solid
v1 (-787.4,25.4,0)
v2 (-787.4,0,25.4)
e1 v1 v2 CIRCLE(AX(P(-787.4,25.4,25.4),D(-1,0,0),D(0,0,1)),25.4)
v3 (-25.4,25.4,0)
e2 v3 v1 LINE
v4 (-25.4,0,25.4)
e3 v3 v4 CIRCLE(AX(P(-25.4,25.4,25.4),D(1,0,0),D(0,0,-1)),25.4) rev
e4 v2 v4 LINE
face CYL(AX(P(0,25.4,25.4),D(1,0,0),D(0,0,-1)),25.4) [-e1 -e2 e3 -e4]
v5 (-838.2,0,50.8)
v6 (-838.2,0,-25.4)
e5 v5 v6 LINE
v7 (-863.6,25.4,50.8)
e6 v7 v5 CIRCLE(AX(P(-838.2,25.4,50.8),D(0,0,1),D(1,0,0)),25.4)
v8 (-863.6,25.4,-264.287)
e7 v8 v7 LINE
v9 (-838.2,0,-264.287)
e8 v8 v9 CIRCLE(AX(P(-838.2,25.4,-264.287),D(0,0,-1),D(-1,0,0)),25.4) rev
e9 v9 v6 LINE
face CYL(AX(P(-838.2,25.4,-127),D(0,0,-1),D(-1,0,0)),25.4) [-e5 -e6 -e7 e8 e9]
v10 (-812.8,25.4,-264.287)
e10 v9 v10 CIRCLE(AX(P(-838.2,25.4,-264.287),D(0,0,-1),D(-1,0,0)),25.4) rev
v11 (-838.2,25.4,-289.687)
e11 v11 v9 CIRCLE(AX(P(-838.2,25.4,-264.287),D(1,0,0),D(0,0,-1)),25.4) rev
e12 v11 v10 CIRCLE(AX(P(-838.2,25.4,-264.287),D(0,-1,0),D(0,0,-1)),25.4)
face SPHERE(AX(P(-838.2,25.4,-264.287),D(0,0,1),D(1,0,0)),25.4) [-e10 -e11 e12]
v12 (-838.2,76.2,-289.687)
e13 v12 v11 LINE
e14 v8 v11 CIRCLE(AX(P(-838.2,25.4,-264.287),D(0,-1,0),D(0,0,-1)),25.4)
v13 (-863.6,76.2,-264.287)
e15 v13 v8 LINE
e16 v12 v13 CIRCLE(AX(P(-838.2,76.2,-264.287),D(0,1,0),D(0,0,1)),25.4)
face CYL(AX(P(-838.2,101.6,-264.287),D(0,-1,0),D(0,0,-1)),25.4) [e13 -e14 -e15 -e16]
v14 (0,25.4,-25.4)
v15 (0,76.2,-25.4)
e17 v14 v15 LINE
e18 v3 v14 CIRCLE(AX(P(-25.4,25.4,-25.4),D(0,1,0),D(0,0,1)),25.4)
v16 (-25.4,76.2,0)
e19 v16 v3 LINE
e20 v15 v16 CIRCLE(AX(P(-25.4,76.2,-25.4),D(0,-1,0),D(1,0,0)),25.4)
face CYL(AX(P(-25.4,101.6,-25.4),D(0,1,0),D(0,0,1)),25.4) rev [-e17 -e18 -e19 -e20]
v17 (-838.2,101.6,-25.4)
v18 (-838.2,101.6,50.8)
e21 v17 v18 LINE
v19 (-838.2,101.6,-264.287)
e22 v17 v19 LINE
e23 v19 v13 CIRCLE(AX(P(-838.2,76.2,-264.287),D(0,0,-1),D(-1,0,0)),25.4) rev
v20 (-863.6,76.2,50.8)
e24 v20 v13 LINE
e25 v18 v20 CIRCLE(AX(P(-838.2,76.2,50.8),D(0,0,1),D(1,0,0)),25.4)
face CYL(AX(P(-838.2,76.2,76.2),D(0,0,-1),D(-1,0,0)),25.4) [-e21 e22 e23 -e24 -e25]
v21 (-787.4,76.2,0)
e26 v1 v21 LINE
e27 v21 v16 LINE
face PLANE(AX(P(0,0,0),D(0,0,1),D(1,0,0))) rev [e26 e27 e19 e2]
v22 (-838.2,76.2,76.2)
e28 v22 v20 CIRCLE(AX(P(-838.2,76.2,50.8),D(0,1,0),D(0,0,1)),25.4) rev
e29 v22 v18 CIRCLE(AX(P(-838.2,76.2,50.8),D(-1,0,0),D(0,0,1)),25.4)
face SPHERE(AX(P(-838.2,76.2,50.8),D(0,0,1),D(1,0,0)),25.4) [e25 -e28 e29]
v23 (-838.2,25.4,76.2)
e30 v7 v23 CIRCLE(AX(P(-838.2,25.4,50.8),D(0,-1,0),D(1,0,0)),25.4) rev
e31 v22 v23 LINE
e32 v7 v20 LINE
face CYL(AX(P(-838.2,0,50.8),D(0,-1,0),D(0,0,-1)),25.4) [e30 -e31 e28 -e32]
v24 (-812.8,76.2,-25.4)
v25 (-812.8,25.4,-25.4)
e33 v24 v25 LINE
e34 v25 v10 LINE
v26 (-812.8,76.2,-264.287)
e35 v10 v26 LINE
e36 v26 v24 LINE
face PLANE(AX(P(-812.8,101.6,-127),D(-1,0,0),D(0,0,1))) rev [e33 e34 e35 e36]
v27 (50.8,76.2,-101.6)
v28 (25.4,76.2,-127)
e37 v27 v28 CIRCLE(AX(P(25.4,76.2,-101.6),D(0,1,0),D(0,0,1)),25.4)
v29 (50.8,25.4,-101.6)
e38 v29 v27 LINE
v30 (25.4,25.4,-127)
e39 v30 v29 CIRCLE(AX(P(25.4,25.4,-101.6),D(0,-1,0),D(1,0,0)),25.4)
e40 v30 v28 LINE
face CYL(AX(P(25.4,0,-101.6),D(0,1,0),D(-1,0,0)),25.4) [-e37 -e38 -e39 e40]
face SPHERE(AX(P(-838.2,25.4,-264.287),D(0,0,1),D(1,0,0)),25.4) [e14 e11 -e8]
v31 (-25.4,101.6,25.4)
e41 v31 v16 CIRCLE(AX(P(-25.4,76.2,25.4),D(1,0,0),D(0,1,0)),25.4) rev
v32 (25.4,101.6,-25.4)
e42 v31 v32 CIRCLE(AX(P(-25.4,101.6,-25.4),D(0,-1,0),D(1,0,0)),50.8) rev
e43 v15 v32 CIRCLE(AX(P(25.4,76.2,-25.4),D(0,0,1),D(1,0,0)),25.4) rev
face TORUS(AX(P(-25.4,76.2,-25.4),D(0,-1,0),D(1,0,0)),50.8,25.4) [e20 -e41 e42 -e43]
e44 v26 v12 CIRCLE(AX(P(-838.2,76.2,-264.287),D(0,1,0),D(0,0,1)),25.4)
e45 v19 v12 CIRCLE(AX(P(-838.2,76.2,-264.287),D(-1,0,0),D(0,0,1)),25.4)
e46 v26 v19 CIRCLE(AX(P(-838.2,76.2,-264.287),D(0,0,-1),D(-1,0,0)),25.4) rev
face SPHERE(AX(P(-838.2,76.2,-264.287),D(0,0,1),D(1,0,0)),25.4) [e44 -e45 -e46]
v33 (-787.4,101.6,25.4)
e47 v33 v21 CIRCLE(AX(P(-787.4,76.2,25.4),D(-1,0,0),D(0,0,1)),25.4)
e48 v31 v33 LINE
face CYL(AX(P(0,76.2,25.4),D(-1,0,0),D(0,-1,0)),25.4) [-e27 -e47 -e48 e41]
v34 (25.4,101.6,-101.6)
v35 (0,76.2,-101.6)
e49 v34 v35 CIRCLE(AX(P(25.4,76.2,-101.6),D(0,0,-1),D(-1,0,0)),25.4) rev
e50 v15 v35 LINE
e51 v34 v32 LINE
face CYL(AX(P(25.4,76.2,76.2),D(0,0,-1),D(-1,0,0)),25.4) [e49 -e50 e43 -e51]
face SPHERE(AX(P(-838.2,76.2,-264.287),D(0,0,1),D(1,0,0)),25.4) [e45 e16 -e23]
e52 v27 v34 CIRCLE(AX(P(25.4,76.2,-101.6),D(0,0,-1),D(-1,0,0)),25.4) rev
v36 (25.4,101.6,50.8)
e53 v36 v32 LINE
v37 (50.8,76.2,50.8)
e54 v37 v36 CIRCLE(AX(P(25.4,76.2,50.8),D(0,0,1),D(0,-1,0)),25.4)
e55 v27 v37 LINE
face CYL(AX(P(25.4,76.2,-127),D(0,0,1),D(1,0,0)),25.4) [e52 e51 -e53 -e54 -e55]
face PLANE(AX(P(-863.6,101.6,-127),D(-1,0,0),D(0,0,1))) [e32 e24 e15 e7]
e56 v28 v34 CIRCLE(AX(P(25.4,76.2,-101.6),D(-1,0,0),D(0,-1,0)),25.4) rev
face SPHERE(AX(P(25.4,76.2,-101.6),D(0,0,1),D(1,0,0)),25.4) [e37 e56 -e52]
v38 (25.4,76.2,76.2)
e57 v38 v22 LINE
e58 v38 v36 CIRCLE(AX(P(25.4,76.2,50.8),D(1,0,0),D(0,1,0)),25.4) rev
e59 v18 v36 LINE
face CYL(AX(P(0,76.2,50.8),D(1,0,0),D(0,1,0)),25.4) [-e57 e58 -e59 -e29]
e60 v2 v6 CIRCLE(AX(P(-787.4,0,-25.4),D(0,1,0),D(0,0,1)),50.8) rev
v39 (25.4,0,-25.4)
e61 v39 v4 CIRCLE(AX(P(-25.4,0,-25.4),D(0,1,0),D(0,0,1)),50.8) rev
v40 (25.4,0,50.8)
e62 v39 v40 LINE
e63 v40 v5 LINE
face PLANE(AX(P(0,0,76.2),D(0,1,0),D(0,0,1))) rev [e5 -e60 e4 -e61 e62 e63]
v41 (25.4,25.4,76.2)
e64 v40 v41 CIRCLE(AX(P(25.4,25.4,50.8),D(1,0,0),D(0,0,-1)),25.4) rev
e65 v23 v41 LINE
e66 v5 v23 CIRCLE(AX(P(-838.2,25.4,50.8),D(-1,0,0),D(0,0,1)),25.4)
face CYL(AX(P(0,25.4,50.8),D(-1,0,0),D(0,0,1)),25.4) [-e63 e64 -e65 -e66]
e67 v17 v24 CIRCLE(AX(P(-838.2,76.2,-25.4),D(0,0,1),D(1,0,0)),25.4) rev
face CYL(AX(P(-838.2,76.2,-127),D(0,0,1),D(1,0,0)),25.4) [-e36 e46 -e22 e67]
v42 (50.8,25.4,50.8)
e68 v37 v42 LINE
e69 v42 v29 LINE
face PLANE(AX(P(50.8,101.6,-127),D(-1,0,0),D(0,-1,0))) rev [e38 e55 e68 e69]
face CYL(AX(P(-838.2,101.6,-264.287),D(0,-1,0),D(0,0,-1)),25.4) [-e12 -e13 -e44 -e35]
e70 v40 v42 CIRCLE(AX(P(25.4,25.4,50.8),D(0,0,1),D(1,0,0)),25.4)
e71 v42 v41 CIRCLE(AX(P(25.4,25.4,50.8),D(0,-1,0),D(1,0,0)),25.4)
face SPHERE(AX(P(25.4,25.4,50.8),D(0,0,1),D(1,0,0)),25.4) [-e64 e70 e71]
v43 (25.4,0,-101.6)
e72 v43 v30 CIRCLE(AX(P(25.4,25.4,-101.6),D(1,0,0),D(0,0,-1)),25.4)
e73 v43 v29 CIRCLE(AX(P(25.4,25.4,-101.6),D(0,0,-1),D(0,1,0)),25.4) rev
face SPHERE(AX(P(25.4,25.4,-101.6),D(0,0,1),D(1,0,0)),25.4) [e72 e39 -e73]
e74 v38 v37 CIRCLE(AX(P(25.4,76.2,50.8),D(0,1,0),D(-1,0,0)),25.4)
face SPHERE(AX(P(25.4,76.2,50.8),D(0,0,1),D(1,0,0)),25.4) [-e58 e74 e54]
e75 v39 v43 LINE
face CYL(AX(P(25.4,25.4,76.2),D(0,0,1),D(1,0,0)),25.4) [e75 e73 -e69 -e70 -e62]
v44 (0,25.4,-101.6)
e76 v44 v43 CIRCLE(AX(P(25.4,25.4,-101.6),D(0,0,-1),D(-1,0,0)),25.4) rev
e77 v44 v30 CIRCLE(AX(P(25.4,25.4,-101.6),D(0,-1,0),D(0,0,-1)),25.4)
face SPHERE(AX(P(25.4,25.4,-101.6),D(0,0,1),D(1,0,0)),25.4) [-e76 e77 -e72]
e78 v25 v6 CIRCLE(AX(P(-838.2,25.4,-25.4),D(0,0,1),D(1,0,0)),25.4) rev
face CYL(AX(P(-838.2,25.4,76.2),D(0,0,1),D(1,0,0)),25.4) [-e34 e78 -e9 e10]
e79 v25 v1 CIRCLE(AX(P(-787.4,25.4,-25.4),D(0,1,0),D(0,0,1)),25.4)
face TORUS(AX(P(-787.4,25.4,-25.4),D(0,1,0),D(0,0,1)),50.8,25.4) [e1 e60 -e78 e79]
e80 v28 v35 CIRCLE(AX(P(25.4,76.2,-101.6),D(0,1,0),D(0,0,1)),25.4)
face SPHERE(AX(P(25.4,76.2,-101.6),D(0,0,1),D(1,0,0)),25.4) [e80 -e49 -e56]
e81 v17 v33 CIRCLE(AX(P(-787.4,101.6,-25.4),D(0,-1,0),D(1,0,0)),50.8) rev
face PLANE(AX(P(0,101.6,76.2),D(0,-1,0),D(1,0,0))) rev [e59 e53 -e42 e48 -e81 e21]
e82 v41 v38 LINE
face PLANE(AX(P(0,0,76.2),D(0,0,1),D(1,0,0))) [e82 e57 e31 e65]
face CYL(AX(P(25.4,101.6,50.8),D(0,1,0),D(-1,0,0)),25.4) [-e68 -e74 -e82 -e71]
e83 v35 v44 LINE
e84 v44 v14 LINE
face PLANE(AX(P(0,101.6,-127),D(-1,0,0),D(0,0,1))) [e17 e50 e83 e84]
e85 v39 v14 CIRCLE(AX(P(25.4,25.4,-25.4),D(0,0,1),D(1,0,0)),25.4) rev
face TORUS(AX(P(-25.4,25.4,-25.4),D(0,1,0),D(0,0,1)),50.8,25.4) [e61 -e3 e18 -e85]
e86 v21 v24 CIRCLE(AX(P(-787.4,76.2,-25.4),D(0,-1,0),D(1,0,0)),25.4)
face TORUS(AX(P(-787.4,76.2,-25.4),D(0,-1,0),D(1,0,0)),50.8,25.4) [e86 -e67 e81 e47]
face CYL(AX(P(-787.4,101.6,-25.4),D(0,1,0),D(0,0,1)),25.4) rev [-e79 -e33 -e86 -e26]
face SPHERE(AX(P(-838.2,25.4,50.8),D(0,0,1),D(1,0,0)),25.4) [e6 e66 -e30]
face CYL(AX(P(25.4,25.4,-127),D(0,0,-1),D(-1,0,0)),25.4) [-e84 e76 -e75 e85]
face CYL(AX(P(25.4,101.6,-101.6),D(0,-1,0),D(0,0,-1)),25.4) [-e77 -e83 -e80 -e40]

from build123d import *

# Parameters (mm, degrees)
SKETCH1_W           = 812.8
SKETCH1_H           = 101.6
BOSS_EXTRUDE1_DEPTH = 76.2
SKETCH2_W           = 50.8
SKETCH2_H           = 101.6
BOSS_EXTRUDE2_DEPTH = 203.2
SKETCH6_W           = 365.887
SKETCH6_H           = 101.6
BOSS_EXTRUDE5_DEPTH = 50.8
FILLET4_R           = 25.4


with BuildPart() as part:
    # Sketch1 → Boss-Extrude1 (new body)
    with BuildSketch(Plane.XY):
        with Locations((-406.4, 50.8)):
            Rectangle(SKETCH1_W, SKETCH1_H)
    extrude(amount=BOSS_EXTRUDE1_DEPTH)

    # Sketch2 → Boss-Extrude2 (add)
    with BuildSketch(Plane.XY.offset(76.2)):
        with Locations((-838.2, 50.8)):
            Rectangle(SKETCH2_W, SKETCH2_H)
        with Locations((25.4, 50.8)):
            Rectangle(SKETCH2_W, SKETCH2_H)
    extrude(amount=-BOSS_EXTRUDE2_DEPTH)

    # Sketch6 → Boss-Extrude5 (add)
    with BuildSketch(Plane.ZY.offset(863.6)):
        with Locations((-106.7435, 50.8)):
            Rectangle(SKETCH6_W, SKETCH6_H)
    extrude(amount=-BOSS_EXTRUDE5_DEPTH)

    # Fillet4
    fillet4_edges = [part.edges().sort_by_distance(p)[0] for p in [
        (-406.4, 0, 76.2),
        (-812.8, 101.6, -144.8435),
        (-863.6, 101.6, -106.7435),
        (-812.8, 0, -144.8435),
        (-863.6, 0, -106.7435),
        (-863.6, 50.8, 76.2),
        (25.4, 0, -127),
        (50.8, 0, -25.4),
        (0, 0, -63.5),
        (0, 50.8, -127),
        (0, 101.6, -63.5),
        (50.8, 50.8, 76.2),
        (50.8, 101.6, -25.4),
        (25.4, 101.6, -127),
        (50.8, 50.8, -127),
        (-838.2, 101.6, -289.687),
        (-863.6, 50.8, -289.687),
        (-812.8, 50.8, -289.687),
        (-838.2, 0, -289.687),
        (-406.4, 0, 0),
        (-812.8, 50.8, 0),
        (-406.4, 101.6, 0),
        (0, 50.8, 0),
        (-406.4, 101.6, 76.2),
    ]]
    fillet(fillet4_edges, radius=FILLET4_R - 0.0001)  # a hair under: the kernel refuses the full size


solid = part.part
